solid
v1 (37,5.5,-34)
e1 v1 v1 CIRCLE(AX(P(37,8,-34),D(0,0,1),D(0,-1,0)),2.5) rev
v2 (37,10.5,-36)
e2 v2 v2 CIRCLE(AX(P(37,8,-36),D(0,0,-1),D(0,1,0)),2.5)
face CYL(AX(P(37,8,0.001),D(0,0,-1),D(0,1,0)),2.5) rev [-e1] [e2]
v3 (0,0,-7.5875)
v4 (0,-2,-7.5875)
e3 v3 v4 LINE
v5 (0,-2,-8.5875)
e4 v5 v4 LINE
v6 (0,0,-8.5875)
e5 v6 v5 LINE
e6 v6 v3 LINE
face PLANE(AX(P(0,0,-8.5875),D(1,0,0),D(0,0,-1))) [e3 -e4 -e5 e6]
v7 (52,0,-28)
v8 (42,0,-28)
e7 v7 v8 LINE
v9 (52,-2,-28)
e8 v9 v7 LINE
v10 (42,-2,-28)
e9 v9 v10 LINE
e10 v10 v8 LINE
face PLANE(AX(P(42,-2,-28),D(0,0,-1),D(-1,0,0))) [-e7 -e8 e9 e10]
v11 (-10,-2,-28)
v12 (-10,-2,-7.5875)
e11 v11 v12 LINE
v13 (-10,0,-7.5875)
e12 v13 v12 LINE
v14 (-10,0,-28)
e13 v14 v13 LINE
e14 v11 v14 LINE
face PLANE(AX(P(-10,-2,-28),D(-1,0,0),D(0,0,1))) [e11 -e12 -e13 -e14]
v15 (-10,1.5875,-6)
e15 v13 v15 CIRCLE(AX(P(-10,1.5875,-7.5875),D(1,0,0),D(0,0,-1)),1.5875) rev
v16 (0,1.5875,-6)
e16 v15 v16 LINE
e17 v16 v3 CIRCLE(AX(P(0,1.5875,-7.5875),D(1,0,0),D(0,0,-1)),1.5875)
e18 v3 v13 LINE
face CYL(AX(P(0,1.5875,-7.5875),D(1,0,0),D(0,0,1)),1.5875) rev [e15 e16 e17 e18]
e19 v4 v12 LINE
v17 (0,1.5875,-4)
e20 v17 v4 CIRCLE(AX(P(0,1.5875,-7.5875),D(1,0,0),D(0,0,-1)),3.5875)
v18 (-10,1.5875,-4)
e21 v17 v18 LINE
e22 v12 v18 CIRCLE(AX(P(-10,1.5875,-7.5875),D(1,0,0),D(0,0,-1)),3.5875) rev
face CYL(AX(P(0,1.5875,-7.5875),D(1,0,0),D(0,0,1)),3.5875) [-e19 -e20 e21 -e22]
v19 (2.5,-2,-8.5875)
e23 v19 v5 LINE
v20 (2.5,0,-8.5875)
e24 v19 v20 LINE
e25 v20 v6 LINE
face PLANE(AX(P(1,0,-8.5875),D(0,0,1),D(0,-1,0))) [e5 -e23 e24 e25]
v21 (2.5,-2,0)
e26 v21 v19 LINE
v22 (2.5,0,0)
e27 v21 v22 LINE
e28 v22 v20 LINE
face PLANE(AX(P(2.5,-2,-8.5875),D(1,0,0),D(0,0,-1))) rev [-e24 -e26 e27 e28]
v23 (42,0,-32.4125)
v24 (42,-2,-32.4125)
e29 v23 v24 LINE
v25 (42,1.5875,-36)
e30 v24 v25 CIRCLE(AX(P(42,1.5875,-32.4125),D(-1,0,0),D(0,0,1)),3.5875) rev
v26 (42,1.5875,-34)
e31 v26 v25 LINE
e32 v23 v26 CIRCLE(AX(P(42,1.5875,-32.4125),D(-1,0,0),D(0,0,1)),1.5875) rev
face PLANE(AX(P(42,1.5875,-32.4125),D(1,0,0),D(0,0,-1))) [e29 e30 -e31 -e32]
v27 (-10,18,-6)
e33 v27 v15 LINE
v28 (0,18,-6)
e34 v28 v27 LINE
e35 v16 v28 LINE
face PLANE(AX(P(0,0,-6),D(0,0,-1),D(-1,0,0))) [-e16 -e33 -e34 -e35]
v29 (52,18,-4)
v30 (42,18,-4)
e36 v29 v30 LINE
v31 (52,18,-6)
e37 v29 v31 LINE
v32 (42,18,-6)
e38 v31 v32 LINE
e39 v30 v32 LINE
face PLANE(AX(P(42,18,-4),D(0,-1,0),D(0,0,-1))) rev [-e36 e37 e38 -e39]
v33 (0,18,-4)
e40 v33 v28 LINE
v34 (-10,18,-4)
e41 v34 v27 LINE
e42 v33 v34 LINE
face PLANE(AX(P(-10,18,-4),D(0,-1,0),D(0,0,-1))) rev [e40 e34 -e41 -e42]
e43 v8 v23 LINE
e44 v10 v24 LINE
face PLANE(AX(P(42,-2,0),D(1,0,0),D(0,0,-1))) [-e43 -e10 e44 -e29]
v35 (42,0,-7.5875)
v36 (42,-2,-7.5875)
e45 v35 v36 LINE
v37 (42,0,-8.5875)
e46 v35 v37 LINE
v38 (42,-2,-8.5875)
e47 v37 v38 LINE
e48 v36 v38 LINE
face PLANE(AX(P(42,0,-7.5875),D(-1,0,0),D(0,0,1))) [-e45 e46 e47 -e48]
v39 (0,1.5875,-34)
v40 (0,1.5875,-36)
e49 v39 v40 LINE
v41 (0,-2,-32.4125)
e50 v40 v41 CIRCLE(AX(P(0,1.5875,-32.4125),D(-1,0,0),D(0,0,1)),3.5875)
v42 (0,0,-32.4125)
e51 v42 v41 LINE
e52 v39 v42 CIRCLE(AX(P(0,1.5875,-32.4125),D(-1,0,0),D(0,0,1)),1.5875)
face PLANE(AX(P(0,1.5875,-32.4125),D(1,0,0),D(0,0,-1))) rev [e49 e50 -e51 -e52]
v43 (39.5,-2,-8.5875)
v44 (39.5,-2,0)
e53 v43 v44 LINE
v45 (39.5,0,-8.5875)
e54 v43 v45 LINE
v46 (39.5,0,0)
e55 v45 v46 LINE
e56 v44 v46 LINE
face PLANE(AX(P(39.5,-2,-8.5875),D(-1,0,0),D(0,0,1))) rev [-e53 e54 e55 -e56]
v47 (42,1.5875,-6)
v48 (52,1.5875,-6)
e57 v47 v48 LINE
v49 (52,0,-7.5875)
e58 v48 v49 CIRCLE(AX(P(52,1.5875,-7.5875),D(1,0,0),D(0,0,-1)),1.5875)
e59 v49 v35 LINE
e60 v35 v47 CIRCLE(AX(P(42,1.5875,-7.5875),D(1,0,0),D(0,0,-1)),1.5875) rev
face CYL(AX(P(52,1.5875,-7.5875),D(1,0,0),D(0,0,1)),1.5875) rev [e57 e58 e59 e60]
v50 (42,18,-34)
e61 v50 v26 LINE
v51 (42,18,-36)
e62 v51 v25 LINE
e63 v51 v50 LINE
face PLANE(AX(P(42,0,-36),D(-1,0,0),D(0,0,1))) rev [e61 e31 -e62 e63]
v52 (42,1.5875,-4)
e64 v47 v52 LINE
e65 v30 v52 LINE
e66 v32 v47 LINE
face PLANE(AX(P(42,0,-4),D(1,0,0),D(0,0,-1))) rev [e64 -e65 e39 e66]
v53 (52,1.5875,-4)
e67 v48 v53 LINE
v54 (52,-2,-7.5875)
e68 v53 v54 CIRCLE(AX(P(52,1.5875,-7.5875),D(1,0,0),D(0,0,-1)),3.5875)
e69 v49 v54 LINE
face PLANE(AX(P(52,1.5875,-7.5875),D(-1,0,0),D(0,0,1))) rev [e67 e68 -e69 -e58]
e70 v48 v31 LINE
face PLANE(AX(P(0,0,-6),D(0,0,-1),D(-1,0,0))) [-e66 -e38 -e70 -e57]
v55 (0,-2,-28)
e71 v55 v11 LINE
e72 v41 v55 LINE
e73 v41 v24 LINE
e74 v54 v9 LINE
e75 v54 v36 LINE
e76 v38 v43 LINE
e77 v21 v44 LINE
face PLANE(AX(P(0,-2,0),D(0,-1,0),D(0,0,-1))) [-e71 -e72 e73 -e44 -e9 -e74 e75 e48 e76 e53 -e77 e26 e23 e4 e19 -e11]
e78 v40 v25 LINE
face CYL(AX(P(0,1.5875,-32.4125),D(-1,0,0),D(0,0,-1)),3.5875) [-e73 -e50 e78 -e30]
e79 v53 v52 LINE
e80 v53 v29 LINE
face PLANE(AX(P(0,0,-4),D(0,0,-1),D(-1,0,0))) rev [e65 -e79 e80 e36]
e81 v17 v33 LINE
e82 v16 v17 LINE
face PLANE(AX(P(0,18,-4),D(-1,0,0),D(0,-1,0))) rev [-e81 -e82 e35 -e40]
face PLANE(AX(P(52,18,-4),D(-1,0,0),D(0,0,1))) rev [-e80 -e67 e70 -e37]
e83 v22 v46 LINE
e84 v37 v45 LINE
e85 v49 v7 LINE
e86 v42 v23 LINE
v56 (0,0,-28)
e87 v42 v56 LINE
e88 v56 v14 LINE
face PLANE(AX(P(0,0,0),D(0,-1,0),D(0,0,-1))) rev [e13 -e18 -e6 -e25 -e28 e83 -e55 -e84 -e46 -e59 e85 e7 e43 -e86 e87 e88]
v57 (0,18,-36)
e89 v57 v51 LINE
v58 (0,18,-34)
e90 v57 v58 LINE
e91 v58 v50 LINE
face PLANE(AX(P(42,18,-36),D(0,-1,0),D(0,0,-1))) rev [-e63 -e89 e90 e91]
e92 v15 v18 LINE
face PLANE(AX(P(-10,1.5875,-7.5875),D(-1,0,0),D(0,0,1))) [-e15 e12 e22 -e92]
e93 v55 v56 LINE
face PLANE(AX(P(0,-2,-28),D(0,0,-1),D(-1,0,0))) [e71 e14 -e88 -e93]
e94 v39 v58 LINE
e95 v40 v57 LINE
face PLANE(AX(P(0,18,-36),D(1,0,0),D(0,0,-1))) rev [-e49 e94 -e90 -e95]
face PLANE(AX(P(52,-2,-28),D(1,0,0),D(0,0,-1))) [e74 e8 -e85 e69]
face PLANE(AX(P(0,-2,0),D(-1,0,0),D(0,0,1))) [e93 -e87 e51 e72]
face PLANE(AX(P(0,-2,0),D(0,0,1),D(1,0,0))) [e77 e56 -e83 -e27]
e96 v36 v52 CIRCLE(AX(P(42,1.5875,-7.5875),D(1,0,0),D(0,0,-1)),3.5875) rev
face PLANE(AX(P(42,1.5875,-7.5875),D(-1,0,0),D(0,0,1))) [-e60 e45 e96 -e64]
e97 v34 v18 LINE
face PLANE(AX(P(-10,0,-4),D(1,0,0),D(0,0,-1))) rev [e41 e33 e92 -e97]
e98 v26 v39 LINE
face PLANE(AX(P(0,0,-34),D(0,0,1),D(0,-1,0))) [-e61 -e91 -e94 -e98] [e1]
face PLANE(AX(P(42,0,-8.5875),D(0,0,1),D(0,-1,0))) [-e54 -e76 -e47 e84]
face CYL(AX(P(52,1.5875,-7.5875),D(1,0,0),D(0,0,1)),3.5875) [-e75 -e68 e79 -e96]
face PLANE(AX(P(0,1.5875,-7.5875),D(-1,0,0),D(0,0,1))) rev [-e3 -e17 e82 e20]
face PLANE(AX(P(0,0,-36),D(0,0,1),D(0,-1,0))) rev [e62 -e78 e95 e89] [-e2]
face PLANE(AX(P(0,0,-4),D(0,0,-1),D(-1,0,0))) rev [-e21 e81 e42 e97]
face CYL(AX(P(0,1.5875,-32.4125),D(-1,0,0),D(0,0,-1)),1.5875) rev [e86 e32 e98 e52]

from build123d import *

# Parameters (mm, degrees)
SKETCH1_W                    = 42
SKETCH1_H                    = 36
BASE_FLANGE1_DEPTH           = 2
SKETCH6_W                    = 10
SKETCH6_H                    = 24
TAB1_DEPTH                   = 2
SKETCH9_W                    = 10
SKETCH9_H                    = 24
TAB2_DEPTH                   = 2
EDGE_FLANGE1_STRIP_W         = 11.175
EDGE_FLANGE1_STRIP_H         = 2
EDGE_FLANGE1_STRIP_CUT_DEPTH = 42
EDGE_FLANGE1_DEPTH           = 42
EDGE_FLANGE2_START           = -10
EDGE_FLANGE2_DEPTH           = 11
EDGE_FLANGE2_2_DEPTH         = 1
EDGE_FLANGE2_3_DEPTH         = 10
EDGE_FLANGE3_START           = 41
EDGE_FLANGE3_DEPTH           = 11
EDGE_FLANGE3_2_DEPTH         = 1
EDGE_FLANGE3_START_2         = 42
EDGE_FLANGE3_3_DEPTH         = 10
SKETCH21_W                   = 1
SKETCH21_H                   = 4
CUT_EXTRUDE1_DEPTH           = 10
SKETCH22_W                   = 1
SKETCH22_H                   = 4
CUT_EXTRUDE2_DEPTH           = 2
SKETCH23_W                   = 1.5
SKETCH23_H                   = 8.5875
CUT_EXTRUDE3_DEPTH           = 2
SKETCH24_W                   = 1.5
SKETCH24_H                   = 8.5875
CUT_EXTRUDE4_DEPTH           = 2
CUT_EXTRUDE5_REACH           = 67.757
SKETCH26_R                   = 2.5


# Read off the part's stored shape, not the designer's step: Edge-Flange2, Edge-Flange3
# Sheet-metal steps are written as plain solids
with BuildPart() as part:
    # Sketch1 → Base-Flange1 (new body)
    with BuildSketch(Plane(origin=(0, 0, 0), x_dir=(1, 0, 0), z_dir=(0, 1, 0))):
        with Locations((21, 18)):
            Rectangle(SKETCH1_W, SKETCH1_H)
    extrude(amount=-BASE_FLANGE1_DEPTH)

    # Sketch6 → Tab1 (add)
    with BuildSketch(Plane(origin=(0, 0, 0), x_dir=(1, 0, 0), z_dir=(0, 1, 0))):
        with Locations((47, 16)):
            Rectangle(SKETCH6_W, SKETCH6_H)
    extrude(amount=-TAB1_DEPTH)

    # Sketch9 → Tab2 (add)
    with BuildSketch(Plane(origin=(0, 0, 0), x_dir=(1, 0, 0), z_dir=(0, 1, 0))):
        with Locations((-5, 16)):
            Rectangle(SKETCH9_W, SKETCH9_H)
    extrude(amount=-TAB2_DEPTH)

    # Edge-Flange1 strip (across the edge) → Edge-Flange1 strip cut (cut)
    with BuildSketch(Plane(origin=(42, 0, -36), x_dir=(0, 0, 1), z_dir=(-1, 0, 0))):
        with Locations((-2, -1)):
            Rectangle(EDGE_FLANGE1_STRIP_W, EDGE_FLANGE1_STRIP_H)
    extrude(amount=EDGE_FLANGE1_STRIP_CUT_DEPTH, mode=Mode.SUBTRACT)

    # Edge-Flange1 section (across the edge) → Edge-Flange1 (add)
    with BuildSketch(Plane(origin=(42, 0, -36), x_dir=(0, 0, 1), z_dir=(-1, 0, 0))):
        with BuildLine():
            Line((0, 1.5875), (0, 18))
            Line((0, 18), (2, 18))
            Line((2, 18), (2, 1.5875))
            ThreePointArc((2, 1.5875), (2.464967985, 0.464967985), (3.5875, 0))
            Line((3.5875, 0), (3.5875, -2))
            ThreePointArc((3.5875, -2), (1.050754422, -0.949245578), (0, 1.5875))
        make_face()
    extrude(amount=EDGE_FLANGE1_DEPTH)

    # Edge-Flange2 outline → Edge-Flange2 (cut)
    with BuildSketch(Plane.YZ.offset(EDGE_FLANGE2_START)):
        with BuildLine():
            ThreePointArc((-2, -7.5875), (-1.45924519, -5.693430307), (0, -4.370358411))
            Line((0, -4.370358411), (0, -4))
            Line((0, -4), (-2, -4))
            Line((-2, -4), (-2, -7.5875))
        make_face()
    extrude(amount=EDGE_FLANGE2_DEPTH, mode=Mode.SUBTRACT)

    # Edge-Flange2 2 outline → Edge-Flange2 2 (cut)
    with BuildSketch(Plane.YZ):
        with BuildLine():
            Line((0, -8.5875), (0, -4.370358411))
            ThreePointArc((0, -4.370358411), (-1.45924519, -5.693430307), (-2, -7.5875))
            Line((-2, -7.5875), (-2, -8.5875))
            Line((-2, -8.5875), (0, -8.5875))
        make_face()
    extrude(amount=EDGE_FLANGE2_2_DEPTH, mode=Mode.SUBTRACT)

    # Edge-Flange2 3 outline → Edge-Flange2 3 (add)
    with BuildSketch(Plane.YZ.offset(EDGE_FLANGE2_START)):
        with BuildLine():
            Line((18, -4), (1.5875, -4))
            ThreePointArc((1.5875, -4), (0.77243534, -4.093816292), (0, -4.370358411))
            Line((0, -4.370358411), (0, -7.5875))
            ThreePointArc((0, -7.5875), (0.464967985, -6.464967985), (1.5875, -6))
            Line((1.5875, -6), (18, -6))
            Line((18, -6), (18, -4))
        make_face()
    extrude(amount=EDGE_FLANGE2_3_DEPTH)

    # Edge-Flange3 outline → Edge-Flange3 (cut)
    with BuildSketch(Plane.YZ.offset(EDGE_FLANGE3_START)):
        with BuildLine():
            ThreePointArc((-2, -7.5875), (-1.45924519, -5.693430307), (0, -4.370358411))
            Line((0, -4.370358411), (0, -4))
            Line((0, -4), (-2, -4))
            Line((-2, -4), (-2, -7.5875))
        make_face()
    extrude(amount=EDGE_FLANGE3_DEPTH, mode=Mode.SUBTRACT)

    # Edge-Flange3 2 outline → Edge-Flange3 2 (cut)
    with BuildSketch(Plane.YZ.offset(EDGE_FLANGE3_START)):
        with BuildLine():
            Line((0, -8.5875), (0, -4.370358411))
            ThreePointArc((0, -4.370358411), (-1.45924519, -5.693430307), (-2, -7.5875))
            Line((-2, -7.5875), (-2, -8.5875))
            Line((-2, -8.5875), (0, -8.5875))
        make_face()
    extrude(amount=EDGE_FLANGE3_2_DEPTH, mode=Mode.SUBTRACT)

    # Edge-Flange3 3 outline → Edge-Flange3 3 (add)
    with BuildSketch(Plane.YZ.offset(EDGE_FLANGE3_START_2)):
        with BuildLine():
            Line((18, -6), (18, -4))
            Line((18, -4), (1.5875, -4))
            ThreePointArc((1.5875, -4), (0.77243534, -4.093816292), (0, -4.370358411))
            Line((0, -4.370358411), (0, -7.5875))
            ThreePointArc((0, -7.5875), (0.464967985, -6.464967985), (1.5875, -6))
            Line((1.5875, -6), (18, -6))
        make_face()
    extrude(amount=EDGE_FLANGE3_3_DEPTH)

    # Sketch21 → Cut-Extrude1 (cut)
    with BuildSketch(Plane(origin=(0, 0, 0), x_dir=(1, 0, 0), z_dir=(0, 1, 0))):
        with Locations((0.5, 2)):
            Rectangle(SKETCH21_W, SKETCH21_H)
    extrude(amount=-CUT_EXTRUDE1_DEPTH, mode=Mode.SUBTRACT)

    # Sketch22 → Cut-Extrude2 (cut)
    with BuildSketch(Plane(origin=(0, 0, 0), x_dir=(1, 0, 0), z_dir=(0, 1, 0))):
        with Locations((41.5, 2)):
            Rectangle(SKETCH22_W, SKETCH22_H)
    extrude(amount=-CUT_EXTRUDE2_DEPTH, mode=Mode.SUBTRACT)

    # Sketch23 → Cut-Extrude3 (cut)
    with BuildSketch(Plane(origin=(0, 0, 0), x_dir=(1, 0, 0), z_dir=(0, 1, 0))):
        with Locations((1.75, 4.29375)):
            Rectangle(SKETCH23_W, SKETCH23_H)
    extrude(amount=-CUT_EXTRUDE3_DEPTH, mode=Mode.SUBTRACT)

    # Sketch24 → Cut-Extrude4 (cut)
    with BuildSketch(Plane(origin=(0, 0, 0), x_dir=(1, 0, 0), z_dir=(0, 1, 0))):
        with Locations((40.25, 4.29375)):
            Rectangle(SKETCH24_W, SKETCH24_H)
    extrude(amount=-CUT_EXTRUDE4_DEPTH, mode=Mode.SUBTRACT)

    # Sketch26 → Cut-Extrude5 (cut, up to next)
    with BuildSketch(Plane(origin=(0, 0, -36), x_dir=(-1, 0, 0), z_dir=(0, 0, -1)), mode=Mode.PRIVATE) as cut_extrude5_sk1:
        with Locations(Location((-37, 8, 0), (0, 0, 90))):
            Circle(SKETCH26_R)
    cut_extrude5_tool1 = extrude(cut_extrude5_sk1.sketch, amount=-CUT_EXTRUDE5_REACH, mode=Mode.PRIVATE) & part.part
    add(cut_extrude5_tool1.solids().sort_by_distance((37, 8, -36))[0], mode=Mode.SUBTRACT)


solid = part.part
